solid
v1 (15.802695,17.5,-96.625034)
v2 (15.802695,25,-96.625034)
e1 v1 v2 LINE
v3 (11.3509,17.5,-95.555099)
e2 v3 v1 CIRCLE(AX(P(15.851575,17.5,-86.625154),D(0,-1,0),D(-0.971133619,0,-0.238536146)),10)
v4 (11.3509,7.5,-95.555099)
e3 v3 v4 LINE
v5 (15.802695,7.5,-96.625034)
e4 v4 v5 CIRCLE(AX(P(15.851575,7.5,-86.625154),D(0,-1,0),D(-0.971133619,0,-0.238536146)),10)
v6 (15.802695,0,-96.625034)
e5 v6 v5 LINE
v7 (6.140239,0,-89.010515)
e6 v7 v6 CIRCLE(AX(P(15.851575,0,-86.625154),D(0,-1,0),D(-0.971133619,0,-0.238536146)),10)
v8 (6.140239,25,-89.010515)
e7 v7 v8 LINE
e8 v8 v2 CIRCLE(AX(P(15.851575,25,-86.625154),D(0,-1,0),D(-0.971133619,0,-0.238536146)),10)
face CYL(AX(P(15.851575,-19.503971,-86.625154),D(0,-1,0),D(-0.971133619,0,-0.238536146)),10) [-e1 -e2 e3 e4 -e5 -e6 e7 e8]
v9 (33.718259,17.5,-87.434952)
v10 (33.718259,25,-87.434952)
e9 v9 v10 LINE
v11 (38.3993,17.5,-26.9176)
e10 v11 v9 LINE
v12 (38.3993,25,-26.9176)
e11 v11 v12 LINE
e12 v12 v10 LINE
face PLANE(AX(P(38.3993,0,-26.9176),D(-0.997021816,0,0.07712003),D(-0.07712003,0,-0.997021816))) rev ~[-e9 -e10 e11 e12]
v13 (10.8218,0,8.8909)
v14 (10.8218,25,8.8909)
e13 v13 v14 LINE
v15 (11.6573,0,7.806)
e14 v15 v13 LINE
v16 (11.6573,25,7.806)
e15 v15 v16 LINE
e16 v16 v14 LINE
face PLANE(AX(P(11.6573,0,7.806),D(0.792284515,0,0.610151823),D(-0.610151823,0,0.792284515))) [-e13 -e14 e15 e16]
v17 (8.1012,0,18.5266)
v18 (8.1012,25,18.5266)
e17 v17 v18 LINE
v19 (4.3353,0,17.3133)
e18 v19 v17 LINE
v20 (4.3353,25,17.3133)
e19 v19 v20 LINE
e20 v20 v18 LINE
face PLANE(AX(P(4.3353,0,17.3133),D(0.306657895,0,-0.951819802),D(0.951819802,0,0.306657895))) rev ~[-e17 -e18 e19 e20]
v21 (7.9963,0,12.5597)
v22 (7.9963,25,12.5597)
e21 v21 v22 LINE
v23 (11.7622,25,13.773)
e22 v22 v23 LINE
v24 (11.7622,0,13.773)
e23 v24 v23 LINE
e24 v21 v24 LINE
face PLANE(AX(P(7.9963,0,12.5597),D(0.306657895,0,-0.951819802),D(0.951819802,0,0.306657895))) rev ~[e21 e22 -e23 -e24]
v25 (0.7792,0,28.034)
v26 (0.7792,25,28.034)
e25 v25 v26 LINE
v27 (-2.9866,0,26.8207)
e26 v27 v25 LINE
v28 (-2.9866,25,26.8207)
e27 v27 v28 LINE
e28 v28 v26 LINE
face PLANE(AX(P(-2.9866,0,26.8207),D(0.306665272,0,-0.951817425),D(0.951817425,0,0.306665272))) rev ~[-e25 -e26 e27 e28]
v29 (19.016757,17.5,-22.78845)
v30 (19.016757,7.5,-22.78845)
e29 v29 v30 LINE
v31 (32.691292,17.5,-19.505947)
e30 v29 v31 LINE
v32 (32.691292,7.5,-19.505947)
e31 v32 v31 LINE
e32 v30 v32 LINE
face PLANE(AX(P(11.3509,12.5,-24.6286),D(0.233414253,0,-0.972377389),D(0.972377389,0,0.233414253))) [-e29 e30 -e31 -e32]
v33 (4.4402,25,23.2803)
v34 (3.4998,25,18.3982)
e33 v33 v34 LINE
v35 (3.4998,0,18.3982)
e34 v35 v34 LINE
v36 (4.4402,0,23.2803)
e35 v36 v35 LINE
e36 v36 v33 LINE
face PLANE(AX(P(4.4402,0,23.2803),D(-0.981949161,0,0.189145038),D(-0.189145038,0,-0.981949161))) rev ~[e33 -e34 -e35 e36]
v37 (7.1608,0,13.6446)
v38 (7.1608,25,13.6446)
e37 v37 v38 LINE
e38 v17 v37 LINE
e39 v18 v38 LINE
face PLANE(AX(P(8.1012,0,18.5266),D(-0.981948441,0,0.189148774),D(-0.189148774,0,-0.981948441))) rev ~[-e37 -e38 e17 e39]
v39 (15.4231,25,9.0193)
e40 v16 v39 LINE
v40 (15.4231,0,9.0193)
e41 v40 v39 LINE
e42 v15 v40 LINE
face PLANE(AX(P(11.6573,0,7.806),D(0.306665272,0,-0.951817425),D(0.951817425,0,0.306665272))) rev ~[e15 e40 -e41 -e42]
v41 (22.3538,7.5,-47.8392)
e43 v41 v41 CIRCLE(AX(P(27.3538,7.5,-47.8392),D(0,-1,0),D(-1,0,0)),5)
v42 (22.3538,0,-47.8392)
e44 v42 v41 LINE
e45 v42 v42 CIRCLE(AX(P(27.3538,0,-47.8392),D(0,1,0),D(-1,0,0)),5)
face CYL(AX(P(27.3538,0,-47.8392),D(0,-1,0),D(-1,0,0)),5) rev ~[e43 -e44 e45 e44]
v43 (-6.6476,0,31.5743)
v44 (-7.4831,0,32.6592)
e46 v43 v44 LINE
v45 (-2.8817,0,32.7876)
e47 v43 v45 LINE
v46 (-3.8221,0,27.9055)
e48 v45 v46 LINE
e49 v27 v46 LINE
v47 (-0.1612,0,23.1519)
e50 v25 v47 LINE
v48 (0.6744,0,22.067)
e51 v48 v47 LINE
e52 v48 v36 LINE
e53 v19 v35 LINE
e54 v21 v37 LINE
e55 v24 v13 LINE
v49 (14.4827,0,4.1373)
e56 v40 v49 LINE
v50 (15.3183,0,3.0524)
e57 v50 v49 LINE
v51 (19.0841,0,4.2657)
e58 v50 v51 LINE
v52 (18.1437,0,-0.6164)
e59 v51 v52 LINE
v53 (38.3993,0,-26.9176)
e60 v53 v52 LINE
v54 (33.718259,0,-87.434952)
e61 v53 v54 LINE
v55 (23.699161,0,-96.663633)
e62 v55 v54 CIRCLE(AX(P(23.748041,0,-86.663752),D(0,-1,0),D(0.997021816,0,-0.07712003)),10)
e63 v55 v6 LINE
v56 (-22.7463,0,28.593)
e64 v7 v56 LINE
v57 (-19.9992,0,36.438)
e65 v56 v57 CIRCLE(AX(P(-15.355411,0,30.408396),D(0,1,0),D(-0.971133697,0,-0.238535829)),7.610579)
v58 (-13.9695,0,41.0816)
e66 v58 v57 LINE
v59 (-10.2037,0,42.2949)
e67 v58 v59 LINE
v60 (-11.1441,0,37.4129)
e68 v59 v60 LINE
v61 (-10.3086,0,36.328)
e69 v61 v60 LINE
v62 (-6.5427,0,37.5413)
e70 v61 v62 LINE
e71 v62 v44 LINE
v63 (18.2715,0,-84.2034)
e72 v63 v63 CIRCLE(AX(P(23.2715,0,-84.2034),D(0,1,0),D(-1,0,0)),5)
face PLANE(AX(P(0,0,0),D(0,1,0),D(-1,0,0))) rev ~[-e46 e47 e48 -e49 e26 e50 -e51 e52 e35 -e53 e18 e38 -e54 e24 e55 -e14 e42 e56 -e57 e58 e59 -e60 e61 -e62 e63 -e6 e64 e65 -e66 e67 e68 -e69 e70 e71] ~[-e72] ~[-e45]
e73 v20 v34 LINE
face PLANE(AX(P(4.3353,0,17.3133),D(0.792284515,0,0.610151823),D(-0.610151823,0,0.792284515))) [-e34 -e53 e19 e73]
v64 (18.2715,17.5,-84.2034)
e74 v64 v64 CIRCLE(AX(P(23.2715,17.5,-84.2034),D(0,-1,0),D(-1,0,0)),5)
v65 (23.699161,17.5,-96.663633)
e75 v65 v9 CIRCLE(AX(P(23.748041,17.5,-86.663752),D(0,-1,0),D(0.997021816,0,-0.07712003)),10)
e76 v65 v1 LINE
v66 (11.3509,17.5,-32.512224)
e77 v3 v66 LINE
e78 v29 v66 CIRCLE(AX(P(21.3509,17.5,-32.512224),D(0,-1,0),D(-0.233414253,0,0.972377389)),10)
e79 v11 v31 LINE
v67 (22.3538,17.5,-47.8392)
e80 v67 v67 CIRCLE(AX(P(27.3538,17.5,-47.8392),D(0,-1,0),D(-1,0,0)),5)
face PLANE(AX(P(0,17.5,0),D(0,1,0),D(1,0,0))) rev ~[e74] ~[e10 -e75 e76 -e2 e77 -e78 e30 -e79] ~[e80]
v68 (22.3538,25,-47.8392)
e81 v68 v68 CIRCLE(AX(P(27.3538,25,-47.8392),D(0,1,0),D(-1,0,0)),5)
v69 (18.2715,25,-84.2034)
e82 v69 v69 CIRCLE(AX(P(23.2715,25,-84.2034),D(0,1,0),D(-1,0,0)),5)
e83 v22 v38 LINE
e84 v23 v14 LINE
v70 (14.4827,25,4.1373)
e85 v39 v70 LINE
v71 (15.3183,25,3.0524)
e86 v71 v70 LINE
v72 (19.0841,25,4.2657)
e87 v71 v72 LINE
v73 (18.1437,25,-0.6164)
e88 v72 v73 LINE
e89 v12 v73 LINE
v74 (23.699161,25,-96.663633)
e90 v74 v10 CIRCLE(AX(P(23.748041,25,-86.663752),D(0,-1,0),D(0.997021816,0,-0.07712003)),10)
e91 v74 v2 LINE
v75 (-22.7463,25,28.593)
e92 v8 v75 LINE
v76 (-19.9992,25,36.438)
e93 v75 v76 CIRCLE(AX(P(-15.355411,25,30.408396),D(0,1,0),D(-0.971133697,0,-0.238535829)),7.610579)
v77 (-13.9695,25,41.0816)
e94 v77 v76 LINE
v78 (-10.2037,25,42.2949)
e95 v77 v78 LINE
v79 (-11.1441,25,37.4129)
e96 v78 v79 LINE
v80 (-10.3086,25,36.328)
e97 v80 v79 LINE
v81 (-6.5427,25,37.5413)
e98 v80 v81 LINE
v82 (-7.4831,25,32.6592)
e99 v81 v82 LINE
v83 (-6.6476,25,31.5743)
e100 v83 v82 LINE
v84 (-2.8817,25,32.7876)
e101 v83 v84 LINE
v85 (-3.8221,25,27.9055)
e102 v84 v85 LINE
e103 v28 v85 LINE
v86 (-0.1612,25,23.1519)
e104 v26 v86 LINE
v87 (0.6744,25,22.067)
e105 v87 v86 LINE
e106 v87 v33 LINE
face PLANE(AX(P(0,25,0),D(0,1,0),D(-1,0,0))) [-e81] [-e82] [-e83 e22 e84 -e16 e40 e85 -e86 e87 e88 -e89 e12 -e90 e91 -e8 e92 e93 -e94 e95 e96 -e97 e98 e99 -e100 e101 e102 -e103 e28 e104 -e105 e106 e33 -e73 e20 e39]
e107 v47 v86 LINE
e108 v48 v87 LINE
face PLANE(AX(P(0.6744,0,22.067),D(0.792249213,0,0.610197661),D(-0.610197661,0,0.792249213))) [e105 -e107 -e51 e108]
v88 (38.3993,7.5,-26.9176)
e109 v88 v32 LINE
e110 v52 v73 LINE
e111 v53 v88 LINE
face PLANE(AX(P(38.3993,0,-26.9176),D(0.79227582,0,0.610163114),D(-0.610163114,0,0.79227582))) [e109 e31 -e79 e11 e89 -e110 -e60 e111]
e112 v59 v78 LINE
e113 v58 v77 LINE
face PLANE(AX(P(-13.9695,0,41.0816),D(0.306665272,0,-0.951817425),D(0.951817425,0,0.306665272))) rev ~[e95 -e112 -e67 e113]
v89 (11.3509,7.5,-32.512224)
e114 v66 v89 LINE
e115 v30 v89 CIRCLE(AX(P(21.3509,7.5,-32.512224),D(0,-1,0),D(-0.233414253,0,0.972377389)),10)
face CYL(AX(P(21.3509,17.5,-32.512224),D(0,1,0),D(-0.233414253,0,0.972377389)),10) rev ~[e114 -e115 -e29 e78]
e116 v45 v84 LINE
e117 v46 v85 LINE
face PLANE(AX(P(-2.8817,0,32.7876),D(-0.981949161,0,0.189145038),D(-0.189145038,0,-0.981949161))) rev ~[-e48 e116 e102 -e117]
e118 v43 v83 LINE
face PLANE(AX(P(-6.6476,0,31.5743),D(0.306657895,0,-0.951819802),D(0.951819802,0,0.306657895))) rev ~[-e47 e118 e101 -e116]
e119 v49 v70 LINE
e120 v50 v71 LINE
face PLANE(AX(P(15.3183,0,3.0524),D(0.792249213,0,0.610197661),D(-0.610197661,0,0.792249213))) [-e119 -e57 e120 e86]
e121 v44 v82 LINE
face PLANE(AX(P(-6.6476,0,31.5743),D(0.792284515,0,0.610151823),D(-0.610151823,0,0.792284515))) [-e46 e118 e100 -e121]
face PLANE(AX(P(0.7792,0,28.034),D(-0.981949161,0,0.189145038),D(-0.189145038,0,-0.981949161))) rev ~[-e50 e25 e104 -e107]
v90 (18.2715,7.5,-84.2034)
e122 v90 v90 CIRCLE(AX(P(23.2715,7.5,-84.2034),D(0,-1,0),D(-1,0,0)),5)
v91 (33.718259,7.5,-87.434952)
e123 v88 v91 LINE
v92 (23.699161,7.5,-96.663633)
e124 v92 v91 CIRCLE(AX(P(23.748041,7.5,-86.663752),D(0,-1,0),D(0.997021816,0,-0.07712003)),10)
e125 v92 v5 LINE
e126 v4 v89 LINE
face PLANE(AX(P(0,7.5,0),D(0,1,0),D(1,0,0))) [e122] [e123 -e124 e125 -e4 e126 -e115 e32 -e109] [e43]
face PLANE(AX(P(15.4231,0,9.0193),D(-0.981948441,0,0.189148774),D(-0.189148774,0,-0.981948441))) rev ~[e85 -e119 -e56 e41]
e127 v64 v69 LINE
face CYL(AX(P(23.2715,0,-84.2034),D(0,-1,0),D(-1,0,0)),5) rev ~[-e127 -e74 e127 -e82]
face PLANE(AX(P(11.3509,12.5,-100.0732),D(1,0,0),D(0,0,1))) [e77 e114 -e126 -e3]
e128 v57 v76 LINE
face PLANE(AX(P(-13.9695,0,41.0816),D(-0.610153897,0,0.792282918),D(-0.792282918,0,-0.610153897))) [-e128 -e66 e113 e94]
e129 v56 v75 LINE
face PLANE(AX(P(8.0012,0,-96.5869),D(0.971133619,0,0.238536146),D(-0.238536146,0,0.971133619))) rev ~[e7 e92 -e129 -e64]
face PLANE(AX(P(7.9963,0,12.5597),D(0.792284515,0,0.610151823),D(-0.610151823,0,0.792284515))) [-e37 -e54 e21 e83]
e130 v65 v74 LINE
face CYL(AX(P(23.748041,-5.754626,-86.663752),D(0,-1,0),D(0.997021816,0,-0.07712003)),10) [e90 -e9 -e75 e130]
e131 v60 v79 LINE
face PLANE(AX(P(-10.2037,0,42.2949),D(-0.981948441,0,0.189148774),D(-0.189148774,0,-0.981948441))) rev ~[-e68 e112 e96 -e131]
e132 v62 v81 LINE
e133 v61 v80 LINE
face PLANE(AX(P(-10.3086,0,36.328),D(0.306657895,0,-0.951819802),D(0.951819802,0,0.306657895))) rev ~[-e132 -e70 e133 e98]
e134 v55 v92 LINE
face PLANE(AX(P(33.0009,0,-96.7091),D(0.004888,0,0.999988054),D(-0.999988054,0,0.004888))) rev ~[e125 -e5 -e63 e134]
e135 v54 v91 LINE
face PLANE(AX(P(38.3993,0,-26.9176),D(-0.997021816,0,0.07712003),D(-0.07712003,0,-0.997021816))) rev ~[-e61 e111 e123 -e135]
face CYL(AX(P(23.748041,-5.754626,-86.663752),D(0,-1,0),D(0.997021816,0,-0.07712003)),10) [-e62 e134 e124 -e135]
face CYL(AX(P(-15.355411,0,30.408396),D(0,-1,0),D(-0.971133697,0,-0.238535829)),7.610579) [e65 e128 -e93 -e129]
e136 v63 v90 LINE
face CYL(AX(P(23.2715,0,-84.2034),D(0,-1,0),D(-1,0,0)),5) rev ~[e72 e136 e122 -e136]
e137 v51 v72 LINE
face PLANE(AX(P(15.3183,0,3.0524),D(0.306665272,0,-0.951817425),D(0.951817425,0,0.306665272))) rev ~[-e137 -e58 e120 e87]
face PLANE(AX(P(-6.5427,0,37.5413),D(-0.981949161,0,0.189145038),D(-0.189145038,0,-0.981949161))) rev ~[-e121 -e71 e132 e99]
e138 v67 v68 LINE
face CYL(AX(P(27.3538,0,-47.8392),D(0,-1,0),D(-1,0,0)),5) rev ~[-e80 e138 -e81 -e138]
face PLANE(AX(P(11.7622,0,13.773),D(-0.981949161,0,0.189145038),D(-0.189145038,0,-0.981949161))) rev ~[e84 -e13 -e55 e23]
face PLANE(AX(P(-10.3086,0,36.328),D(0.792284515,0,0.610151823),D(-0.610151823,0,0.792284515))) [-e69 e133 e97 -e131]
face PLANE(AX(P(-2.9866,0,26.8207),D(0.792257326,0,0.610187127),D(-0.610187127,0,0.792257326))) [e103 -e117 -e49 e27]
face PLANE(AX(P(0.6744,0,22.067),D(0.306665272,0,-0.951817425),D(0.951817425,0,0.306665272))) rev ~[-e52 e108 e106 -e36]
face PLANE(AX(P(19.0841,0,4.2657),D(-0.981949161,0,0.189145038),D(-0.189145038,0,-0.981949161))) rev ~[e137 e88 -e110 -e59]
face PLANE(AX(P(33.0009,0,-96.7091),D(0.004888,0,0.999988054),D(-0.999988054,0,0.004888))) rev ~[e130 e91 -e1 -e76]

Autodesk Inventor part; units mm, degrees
ref_plane "YZ Plane" through (0, 0, 0) normal (1, 0, 0) x (0, 1, 0)
ref_plane "XZ Plane" through (0, 0, 0) normal (0, 1, 0) x (-1, 0, 0)
sketch "Sketch1" plane through (0, 0, 0) normal (0, 1, 0) x (-1, 0, 0)
  line L0 (-38.3993, -26.9176) -> (-33.0009, -96.7091)
  line L1 (-33.0009, -96.7091) -> (-8.0012, -96.5869)
  circle A0 centre (-23.2715, -84.2034) radius 5
  circle A1 centre (-27.3538, -47.8392) radius 5
  line L2 (-38.3993, -26.9176) -> (16.6007, -26.9176) construction
  arc A2 (22.7463, 28.593) -> (19.9992, 36.438) centre (15.3555, 30.4084) ccw
  line L3 (-8.0012, -96.5869) -> (22.7463, 28.593)
  line L4 (11.975, 39.0871) -> (13.9695, 41.0816)
  line L5 (13.9695, 41.0816) -> (19.9992, 36.438)
  line L6 (13.9695, 41.0816) -> (16.437, 44.2856)
  line L7 (16.437, 44.2856) -> (13.9695, 41.0816)
  line L8 (13.9695, 41.0816) -> (10.2037, 42.2949)
  line L9 (10.2037, 42.2949) -> (11.1441, 37.4129)
  line L10 (10.3086, 36.328) -> (6.5427, 37.5413)
  line L11 (6.5427, 37.5413) -> (7.4831, 32.6592)
  line L12 (6.6476, 31.5743) -> (2.8817, 32.7876)
  line L13 (2.8817, 32.7876) -> (3.8221, 27.9055)
  line L14 (2.9866, 26.8207) -> (-0.7792, 28.034)
  line L15 (-0.7792, 28.034) -> (0.1612, 23.1519)
  line L16 (-0.6744, 22.067) -> (-4.4402, 23.2803)
  line L17 (-4.4402, 23.2803) -> (-3.4998, 18.3982)
  line L18 (-4.3353, 17.3133) -> (-8.1012, 18.5266)
  line L19 (-8.1012, 18.5266) -> (-7.1608, 13.6446)
  line L20 (-7.9963, 12.5597) -> (-11.7622, 13.773)
  line L21 (-11.7622, 13.773) -> (-10.8218, 8.8909)
  line L22 (-11.6573, 7.806) -> (-15.4231, 9.0193)
  line L23 (-15.4231, 9.0193) -> (-14.4827, 4.1373)
  line L24 (-15.3183, 3.0524) -> (-19.0841, 4.2657)
  line L25 (-19.0841, 4.2657) -> (-18.1437, -0.6164)
  line L26 (10.3086, 36.328) -> (11.1441, 37.4129)
  line L27 (6.6476, 31.5743) -> (7.4831, 32.6592)
  line L28 (2.9866, 26.8207) -> (3.8221, 27.9055)
  line L29 (-0.6744, 22.067) -> (0.1612, 23.1519)
  line L30 (-4.3353, 17.3133) -> (-3.4998, 18.3982)
  line L31 (-7.9963, 12.5597) -> (-7.1608, 13.6446)
  line L32 (-11.6573, 7.806) -> (-10.8218, 8.8909)
  line L33 (-38.3993, -26.9176) -> (-18.1437, -0.6164)
  line L34 (-15.3183, 3.0524) -> (-14.4827, 4.1373)
  point P0 (0, 0)
  dimension "d33" = 10
  dimension "d34" = 10
  dimension "d39" = 6
  dimension "d49" = 70
  dimension "d50" = 25
extrude "Extrusion3" add sketch "Sketch1" along normal blind 25
ref_plane "Work Plane2" through (0, 12.5, 0) normal (0, 1, 0) x (1, 0, 0)
sketch "Sketch4" plane through (0, 12.5, 0) normal (0, 1, 0) x (1, 0, 0)
  line L0 (41.2703, 100.0732) -> (11.3509, 100.0732)
  line L1 (11.3509, 100.0732) -> (11.3509, 24.6286)
  line L2 (11.3509, 24.6286) -> (41.2703, 17.4466)
  line L3 (41.2703, 17.4466) -> (41.2703, 100.0732)
  point P0 (0, 0)
extrude "Extrusion4" cut sketch "Sketch4" along normal mid plane 10
fillet "Fillet5" radius 10 4 edges at (33.0009, 21.25, -96.7091) (33.0009, 3.75, -96.7091) (8.0012, 12.5, -96.5869) (11.3509, 12.5, -24.6286)
properties part number "capit"
